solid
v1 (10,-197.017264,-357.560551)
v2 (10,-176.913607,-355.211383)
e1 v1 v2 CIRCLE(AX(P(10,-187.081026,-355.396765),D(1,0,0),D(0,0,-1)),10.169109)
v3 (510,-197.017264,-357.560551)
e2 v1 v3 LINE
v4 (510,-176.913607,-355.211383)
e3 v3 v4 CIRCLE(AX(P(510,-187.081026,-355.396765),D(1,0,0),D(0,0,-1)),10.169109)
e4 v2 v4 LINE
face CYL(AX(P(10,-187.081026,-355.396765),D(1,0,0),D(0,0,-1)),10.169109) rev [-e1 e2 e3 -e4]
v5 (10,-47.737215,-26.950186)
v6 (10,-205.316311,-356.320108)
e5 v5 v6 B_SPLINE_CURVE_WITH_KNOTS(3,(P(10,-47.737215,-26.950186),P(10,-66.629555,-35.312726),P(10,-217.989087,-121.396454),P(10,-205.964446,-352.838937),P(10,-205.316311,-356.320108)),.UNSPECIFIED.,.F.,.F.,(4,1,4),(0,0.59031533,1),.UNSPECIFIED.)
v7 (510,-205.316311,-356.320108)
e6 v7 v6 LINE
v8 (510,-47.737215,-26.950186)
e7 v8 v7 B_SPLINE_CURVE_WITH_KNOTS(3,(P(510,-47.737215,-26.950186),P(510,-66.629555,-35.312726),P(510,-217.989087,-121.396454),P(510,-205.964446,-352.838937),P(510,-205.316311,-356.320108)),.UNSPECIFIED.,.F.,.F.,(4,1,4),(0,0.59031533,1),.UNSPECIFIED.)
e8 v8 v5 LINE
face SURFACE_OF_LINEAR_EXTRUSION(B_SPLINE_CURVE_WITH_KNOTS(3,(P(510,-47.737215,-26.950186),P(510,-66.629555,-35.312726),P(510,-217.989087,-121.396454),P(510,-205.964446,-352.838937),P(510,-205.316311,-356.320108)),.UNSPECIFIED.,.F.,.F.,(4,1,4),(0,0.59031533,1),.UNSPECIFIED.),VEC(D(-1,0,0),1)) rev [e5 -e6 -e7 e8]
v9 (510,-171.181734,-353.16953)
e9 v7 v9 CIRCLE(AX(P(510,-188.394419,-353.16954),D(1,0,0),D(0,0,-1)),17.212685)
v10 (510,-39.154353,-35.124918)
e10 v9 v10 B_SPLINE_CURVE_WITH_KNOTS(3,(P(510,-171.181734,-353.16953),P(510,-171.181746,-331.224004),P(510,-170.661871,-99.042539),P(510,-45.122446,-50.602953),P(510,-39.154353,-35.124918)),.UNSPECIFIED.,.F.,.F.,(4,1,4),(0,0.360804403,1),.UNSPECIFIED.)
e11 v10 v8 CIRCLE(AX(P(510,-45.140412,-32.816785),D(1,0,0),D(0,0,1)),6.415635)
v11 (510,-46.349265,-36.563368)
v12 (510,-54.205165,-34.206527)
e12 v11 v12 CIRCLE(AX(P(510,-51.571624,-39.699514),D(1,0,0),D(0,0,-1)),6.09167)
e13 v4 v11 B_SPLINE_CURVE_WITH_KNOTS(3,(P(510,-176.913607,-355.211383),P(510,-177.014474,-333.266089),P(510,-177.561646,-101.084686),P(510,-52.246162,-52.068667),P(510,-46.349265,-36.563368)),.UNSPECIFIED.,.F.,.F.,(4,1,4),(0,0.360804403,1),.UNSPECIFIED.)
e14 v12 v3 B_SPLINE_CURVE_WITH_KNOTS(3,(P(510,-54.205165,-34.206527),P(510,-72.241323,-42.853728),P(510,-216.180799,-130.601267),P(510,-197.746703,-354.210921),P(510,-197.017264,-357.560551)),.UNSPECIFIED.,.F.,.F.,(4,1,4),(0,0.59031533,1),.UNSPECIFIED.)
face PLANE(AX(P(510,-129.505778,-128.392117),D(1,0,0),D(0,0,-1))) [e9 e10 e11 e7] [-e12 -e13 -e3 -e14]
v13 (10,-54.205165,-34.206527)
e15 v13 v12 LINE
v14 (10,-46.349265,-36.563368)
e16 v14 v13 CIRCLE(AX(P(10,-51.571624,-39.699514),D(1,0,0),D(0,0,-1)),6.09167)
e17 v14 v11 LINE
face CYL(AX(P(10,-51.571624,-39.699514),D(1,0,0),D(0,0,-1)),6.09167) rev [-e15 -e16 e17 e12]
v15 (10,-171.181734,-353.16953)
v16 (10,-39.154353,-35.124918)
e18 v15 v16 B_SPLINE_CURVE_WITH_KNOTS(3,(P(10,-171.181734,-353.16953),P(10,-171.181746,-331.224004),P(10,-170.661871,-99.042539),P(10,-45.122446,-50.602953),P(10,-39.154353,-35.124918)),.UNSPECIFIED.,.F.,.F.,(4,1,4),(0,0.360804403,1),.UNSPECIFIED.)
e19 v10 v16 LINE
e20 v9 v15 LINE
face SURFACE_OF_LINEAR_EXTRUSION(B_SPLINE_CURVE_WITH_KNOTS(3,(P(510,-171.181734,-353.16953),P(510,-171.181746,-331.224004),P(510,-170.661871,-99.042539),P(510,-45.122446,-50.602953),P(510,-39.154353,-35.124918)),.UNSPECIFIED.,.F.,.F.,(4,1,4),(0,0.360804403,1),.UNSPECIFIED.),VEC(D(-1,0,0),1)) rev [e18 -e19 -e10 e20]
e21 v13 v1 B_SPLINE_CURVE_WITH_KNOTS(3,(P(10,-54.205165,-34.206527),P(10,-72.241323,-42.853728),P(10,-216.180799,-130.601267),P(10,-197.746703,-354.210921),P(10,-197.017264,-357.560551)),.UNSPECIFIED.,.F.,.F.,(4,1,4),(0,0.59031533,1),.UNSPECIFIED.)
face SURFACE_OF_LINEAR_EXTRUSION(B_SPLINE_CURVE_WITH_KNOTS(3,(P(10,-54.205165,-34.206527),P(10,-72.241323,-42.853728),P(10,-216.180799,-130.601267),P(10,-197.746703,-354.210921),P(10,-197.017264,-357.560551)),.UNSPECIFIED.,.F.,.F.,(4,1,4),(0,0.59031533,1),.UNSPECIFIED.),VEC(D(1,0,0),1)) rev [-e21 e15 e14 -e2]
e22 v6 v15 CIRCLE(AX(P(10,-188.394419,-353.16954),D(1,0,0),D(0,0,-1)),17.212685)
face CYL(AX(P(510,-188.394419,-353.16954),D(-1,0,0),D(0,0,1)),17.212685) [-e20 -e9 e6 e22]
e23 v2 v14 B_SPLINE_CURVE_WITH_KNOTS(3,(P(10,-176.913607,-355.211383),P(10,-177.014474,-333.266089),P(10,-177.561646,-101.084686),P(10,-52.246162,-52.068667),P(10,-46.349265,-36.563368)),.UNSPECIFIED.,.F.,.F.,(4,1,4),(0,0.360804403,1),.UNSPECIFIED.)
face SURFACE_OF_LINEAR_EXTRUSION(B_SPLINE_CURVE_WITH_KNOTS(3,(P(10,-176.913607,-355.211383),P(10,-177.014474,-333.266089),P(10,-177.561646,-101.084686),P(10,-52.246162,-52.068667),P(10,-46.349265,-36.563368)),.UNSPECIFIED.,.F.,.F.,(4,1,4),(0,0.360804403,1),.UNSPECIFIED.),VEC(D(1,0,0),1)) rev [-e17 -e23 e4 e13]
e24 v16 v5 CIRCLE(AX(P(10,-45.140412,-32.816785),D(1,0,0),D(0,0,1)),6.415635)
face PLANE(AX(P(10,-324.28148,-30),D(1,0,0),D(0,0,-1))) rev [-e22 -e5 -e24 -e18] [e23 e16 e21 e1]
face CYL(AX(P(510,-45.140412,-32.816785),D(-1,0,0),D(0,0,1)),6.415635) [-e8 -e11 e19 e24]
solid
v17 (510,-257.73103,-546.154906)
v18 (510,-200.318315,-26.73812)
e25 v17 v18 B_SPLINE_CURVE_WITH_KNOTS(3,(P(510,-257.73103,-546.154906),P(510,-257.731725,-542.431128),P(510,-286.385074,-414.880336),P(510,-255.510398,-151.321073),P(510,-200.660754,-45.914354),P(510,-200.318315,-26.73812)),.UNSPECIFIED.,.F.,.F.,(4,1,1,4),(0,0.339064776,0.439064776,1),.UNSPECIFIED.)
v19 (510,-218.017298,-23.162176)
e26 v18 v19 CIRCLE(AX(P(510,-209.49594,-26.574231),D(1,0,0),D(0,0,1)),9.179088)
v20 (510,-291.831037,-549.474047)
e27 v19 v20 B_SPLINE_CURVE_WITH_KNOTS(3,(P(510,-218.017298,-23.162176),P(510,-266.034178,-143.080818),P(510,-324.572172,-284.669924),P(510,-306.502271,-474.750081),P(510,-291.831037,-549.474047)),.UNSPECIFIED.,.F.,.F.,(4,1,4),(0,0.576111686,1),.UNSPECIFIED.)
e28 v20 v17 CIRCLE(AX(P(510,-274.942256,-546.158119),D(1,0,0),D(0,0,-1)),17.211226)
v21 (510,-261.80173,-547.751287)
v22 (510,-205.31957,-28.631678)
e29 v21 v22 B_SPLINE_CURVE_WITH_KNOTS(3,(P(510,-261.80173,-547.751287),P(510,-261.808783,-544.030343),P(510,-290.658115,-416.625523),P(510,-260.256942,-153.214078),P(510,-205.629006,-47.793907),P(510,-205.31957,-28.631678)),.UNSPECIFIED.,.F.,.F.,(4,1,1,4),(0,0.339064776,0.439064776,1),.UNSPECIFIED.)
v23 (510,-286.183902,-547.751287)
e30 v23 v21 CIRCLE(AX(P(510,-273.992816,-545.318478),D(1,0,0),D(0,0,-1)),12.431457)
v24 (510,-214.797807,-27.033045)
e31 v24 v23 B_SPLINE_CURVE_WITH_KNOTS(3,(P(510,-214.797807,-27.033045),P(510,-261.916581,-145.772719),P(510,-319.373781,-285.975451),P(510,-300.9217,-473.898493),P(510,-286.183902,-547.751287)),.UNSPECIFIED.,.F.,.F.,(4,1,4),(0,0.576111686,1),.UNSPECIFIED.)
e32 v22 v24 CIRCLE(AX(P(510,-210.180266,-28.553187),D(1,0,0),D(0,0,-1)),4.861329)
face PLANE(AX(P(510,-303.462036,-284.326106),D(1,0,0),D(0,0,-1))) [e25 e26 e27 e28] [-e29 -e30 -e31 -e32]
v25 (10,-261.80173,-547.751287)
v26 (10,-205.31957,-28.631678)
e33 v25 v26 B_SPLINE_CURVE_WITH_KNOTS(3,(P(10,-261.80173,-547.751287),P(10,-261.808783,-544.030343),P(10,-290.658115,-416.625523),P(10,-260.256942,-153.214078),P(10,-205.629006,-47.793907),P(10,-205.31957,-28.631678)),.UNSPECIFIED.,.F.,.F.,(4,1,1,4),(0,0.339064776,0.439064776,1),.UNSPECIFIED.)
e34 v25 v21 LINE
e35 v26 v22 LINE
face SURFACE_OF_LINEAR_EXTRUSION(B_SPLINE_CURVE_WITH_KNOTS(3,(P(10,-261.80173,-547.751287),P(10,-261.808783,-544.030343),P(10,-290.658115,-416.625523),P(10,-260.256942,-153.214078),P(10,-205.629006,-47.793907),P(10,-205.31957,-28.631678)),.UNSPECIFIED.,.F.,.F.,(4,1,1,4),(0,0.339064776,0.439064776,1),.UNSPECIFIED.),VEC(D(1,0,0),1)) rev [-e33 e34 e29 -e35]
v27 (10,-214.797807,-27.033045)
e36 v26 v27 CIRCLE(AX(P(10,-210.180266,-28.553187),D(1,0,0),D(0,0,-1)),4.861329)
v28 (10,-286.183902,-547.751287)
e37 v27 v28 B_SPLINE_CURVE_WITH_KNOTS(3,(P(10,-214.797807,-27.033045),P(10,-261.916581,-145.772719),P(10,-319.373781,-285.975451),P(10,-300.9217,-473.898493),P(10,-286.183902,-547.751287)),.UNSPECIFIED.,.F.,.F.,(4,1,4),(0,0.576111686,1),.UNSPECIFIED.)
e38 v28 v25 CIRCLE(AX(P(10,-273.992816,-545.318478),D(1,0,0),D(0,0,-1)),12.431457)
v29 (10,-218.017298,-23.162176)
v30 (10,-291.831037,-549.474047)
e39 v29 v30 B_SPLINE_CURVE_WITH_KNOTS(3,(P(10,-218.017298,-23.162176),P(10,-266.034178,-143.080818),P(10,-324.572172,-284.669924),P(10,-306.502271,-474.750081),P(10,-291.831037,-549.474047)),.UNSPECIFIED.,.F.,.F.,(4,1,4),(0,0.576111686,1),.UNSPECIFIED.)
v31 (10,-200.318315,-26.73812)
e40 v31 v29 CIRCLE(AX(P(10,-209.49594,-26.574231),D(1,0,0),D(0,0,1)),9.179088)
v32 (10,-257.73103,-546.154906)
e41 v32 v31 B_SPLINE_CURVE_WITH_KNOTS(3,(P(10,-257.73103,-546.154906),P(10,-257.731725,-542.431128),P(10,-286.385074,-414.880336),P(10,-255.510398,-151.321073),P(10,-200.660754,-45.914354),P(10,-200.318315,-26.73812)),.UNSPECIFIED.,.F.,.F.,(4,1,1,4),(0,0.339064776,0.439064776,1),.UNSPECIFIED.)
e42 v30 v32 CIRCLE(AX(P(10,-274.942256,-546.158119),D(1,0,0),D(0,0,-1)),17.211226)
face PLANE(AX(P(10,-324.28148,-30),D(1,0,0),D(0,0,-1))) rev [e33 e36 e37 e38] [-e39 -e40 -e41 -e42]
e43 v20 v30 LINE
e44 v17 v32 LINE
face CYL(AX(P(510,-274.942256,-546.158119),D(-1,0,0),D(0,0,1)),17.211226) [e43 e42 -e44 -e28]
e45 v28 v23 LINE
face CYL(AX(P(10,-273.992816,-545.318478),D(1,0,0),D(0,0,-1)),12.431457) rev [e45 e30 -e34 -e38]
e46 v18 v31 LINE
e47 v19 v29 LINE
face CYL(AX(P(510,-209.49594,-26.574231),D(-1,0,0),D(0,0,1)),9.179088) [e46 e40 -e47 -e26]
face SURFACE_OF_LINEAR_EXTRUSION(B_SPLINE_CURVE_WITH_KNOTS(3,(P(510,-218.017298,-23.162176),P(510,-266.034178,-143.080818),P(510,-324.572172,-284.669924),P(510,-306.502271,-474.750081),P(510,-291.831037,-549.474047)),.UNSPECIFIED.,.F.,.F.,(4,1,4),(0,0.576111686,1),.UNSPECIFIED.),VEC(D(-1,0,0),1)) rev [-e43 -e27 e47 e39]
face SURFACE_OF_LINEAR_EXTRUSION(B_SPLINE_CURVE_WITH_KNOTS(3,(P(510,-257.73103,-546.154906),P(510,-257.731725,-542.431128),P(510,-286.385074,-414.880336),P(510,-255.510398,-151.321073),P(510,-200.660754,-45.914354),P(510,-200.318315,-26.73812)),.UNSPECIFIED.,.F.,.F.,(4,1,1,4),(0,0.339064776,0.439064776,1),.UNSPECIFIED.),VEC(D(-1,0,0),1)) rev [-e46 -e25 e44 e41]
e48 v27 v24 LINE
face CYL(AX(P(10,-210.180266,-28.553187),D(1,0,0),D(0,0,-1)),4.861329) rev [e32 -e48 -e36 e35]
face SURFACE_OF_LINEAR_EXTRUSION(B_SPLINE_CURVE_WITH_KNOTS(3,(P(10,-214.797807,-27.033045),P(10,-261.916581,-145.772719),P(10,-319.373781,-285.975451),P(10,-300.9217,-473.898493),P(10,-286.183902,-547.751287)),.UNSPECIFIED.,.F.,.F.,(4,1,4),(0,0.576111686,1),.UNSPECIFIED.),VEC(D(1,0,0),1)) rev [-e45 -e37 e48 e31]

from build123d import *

# Parameters (mm, degrees)
BOSS_EXTRUDE1_DEPTH = 10
BOSS_EXTRUDE3_DEPTH = 500
SPLIT1_DEPTH        = 10
CUT_EXTRUDE4_DEPTH  = 815.609824939


# Read off the part's stored shape, not the designer's step: Split1
with BuildPart() as part:
    # Sketch1 → Boss-Extrude1 (new body)
    with BuildSketch(Plane(origin=(0, 0, 0), x_dir=(0, 0, -1), z_dir=(1, 0, 0))):
        with BuildLine():
            Line((0, -14.281480067), (0, -294.281480067))
            ThreePointArc((0, -294.281480067), (8.786796564, -315.494683503), (30, -324.281480067))
            Line((30, -324.281480067), (573.815572472, -324.281480067))
            ThreePointArc((573.815572472, -324.281480067), (580.886640283, -321.352547879), (583.815572472, -314.281480067))
            Line((583.815572472, -314.281480067), (583.815572472, -219.493566063))
            ThreePointArc((583.815572472, -219.493566063), (582.007092914, -213.757801699), (577.235773905, -210.096639855))
            Line((577.235773905, -210.096639855), (13.420201433, -4.88455386))
            ThreePointArc((13.420201433, -4.88455386), (4.264235636, -6.089959625), (0, -14.281480067))
        make_face()
    extrude(amount=BOSS_EXTRUDE1_DEPTH)

    # Sketch2 → Boss-Extrude3 (add)
    with BuildSketch(Plane(origin=(10, 0, 0), x_dir=(0, 0, -1), z_dir=(1, 0, 0))):
        with BuildLine():
            ThreePointArc((23.162175785, -218.017297737), (17.576945532, -207.678107035), (26.738120061, -200.318314743))
            add(Edge.make_bspline(
                [(26.738120061, -200.318314743), (45.914354434, -200.660753587), (151.32107334, -255.510398156), (414.880335601, -286.385074175), (542.431128002, -257.731725159), (546.154906269, -257.731029979)],
                knots=[0, 0, 0, 0, 0.560935224, 0.660935224, 1, 1, 1, 1], degree=3))
            ThreePointArc((546.154906269, -257.731029979), (563.288388976, -273.27487263), (549.474047026, -291.831036849))
            add(Edge.make_bspline(
                [(23.162175785, -218.017297737), (143.080818041, -266.034178467), (284.669923623, -324.572171749), (474.750080899, -306.502271197), (549.474047026, -291.831036849)],
                knots=[0, 0, 0, 0, 0.576111686, 1, 1, 1, 1], degree=3))
        make_face()
        with BuildLine():
            ThreePointArc((26.950185671, -47.737214996), (28.17113687, -40.715672082), (35.124917897, -39.154353359))
            add(Edge.make_bspline(
                [(35.124917897, -39.154353359), (50.602952828, -45.122445935), (99.042539, -170.661871263), (331.224003862, -171.181746235), (353.169530365, -171.181734297)],
                knots=[0, 0, 0, 0, 0.639195597, 1, 1, 1, 1], degree=3))
            ThreePointArc((353.169530365, -171.181734297), (370.309371751, -186.812434708), (356.32010769, -205.316311305))
            add(Edge.make_bspline(
                [(26.950185671, -47.737214996), (35.312726243, -66.629555086), (121.396454164, -217.989087479), (352.838937223, -205.964445921), (356.32010769, -205.316311305)],
                knots=[0, 0, 0, 0, 0.59031533, 1, 1, 1, 1], degree=3))
        make_face()
    extrude(amount=BOSS_EXTRUDE3_DEPTH)

    # Split1 outline → Split1 (cut)
    with BuildSketch(Plane.YZ):
        with BuildLine():
            ThreePointArc((-294.281480067, 0), (-315.494683503, -8.786796564), (-324.281480067, -30))
            Line((-324.281480067, -30), (-324.281480067, -573.815572472))
            ThreePointArc((-324.281480067, -573.815572472), (-321.352547879, -580.886640284), (-314.281480067, -583.815572472))
            Line((-314.281480067, -583.815572472), (-219.493566063, -583.815572472))
            ThreePointArc((-219.493566063, -583.815572472), (-213.7578017, -582.007092914), (-210.096639855, -577.235773905))
            Line((-210.096639855, -577.235773905), (-4.88455386, -13.420201433))
            ThreePointArc((-4.88455386, -13.420201433), (-6.089959625, -4.264235637), (-14.281480067, 0))
            Line((-14.281480067, 0), (-294.281480067, 0))
        make_face()
    extrude(amount=SPLIT1_DEPTH, mode=Mode.SUBTRACT)

    # Sketch4 → Cut-Extrude4 (cut, through all)
    with BuildSketch(Plane(origin=(510, 0, 0), x_dir=(0, 0, -1), z_dir=(1, 0, 0))):
        with BuildLine():
            ThreePointArc((36.563368255, -46.349264869), (33.864766991, -49.821146991), (34.206527229, -54.205165034))
            add(Edge.make_bspline(
                [(34.206527229, -54.205165034), (42.853728256, -72.241323292), (130.60126666, -216.180799122), (354.210920858, -197.746703186), (357.560551344, -197.017263718)],
                knots=[0, 0, 0, 0, 0.59031533, 1, 1, 1, 1], degree=3))
            ThreePointArc((357.560551344, -197.017263718), (365.49715028, -185.900768208), (355.211383297, -176.91360666))
            add(Edge.make_bspline(
                [(355.211383297, -176.91360666), (333.266088603, -177.014474156), (101.084686466, -177.561646331), (52.068667432, -52.246161661), (36.563368255, -46.349264869)],
                knots=[0, 0, 0, 0, 0.360804403, 1, 1, 1, 1], degree=3))
        make_face()
        with BuildLine():
            ThreePointArc((28.631678276, -205.319570052), (23.759562286, -209.371755875), (27.033044981, -214.797807405))
            add(Edge.make_bspline(
                [(27.033044981, -214.797807405), (145.772718684, -261.916580998), (285.975450577, -319.373780693), (473.898492503, -300.921699774), (547.751286849, -286.183901532)],
                knots=[0, 0, 0, 0, 0.576111686, 1, 1, 1, 1], degree=3))
            ThreePointArc((547.751286849, -286.183901532), (557.749935034, -273.992815704), (547.751286849, -261.801729876))
            add(Edge.make_bspline(
                [(547.751286849, -261.801729876), (544.030343063, -261.808782649), (416.625523479, -290.658115415), (153.214077759, -260.256942022), (47.793906807, -205.629006111), (28.631678276, -205.319570052)],
                knots=[0, 0, 0, 0, 0.339064776, 0.439064776, 1, 1, 1, 1], degree=3))
        make_face()
    extrude(amount=-CUT_EXTRUDE4_DEPTH, mode=Mode.SUBTRACT)


solid = part.part
